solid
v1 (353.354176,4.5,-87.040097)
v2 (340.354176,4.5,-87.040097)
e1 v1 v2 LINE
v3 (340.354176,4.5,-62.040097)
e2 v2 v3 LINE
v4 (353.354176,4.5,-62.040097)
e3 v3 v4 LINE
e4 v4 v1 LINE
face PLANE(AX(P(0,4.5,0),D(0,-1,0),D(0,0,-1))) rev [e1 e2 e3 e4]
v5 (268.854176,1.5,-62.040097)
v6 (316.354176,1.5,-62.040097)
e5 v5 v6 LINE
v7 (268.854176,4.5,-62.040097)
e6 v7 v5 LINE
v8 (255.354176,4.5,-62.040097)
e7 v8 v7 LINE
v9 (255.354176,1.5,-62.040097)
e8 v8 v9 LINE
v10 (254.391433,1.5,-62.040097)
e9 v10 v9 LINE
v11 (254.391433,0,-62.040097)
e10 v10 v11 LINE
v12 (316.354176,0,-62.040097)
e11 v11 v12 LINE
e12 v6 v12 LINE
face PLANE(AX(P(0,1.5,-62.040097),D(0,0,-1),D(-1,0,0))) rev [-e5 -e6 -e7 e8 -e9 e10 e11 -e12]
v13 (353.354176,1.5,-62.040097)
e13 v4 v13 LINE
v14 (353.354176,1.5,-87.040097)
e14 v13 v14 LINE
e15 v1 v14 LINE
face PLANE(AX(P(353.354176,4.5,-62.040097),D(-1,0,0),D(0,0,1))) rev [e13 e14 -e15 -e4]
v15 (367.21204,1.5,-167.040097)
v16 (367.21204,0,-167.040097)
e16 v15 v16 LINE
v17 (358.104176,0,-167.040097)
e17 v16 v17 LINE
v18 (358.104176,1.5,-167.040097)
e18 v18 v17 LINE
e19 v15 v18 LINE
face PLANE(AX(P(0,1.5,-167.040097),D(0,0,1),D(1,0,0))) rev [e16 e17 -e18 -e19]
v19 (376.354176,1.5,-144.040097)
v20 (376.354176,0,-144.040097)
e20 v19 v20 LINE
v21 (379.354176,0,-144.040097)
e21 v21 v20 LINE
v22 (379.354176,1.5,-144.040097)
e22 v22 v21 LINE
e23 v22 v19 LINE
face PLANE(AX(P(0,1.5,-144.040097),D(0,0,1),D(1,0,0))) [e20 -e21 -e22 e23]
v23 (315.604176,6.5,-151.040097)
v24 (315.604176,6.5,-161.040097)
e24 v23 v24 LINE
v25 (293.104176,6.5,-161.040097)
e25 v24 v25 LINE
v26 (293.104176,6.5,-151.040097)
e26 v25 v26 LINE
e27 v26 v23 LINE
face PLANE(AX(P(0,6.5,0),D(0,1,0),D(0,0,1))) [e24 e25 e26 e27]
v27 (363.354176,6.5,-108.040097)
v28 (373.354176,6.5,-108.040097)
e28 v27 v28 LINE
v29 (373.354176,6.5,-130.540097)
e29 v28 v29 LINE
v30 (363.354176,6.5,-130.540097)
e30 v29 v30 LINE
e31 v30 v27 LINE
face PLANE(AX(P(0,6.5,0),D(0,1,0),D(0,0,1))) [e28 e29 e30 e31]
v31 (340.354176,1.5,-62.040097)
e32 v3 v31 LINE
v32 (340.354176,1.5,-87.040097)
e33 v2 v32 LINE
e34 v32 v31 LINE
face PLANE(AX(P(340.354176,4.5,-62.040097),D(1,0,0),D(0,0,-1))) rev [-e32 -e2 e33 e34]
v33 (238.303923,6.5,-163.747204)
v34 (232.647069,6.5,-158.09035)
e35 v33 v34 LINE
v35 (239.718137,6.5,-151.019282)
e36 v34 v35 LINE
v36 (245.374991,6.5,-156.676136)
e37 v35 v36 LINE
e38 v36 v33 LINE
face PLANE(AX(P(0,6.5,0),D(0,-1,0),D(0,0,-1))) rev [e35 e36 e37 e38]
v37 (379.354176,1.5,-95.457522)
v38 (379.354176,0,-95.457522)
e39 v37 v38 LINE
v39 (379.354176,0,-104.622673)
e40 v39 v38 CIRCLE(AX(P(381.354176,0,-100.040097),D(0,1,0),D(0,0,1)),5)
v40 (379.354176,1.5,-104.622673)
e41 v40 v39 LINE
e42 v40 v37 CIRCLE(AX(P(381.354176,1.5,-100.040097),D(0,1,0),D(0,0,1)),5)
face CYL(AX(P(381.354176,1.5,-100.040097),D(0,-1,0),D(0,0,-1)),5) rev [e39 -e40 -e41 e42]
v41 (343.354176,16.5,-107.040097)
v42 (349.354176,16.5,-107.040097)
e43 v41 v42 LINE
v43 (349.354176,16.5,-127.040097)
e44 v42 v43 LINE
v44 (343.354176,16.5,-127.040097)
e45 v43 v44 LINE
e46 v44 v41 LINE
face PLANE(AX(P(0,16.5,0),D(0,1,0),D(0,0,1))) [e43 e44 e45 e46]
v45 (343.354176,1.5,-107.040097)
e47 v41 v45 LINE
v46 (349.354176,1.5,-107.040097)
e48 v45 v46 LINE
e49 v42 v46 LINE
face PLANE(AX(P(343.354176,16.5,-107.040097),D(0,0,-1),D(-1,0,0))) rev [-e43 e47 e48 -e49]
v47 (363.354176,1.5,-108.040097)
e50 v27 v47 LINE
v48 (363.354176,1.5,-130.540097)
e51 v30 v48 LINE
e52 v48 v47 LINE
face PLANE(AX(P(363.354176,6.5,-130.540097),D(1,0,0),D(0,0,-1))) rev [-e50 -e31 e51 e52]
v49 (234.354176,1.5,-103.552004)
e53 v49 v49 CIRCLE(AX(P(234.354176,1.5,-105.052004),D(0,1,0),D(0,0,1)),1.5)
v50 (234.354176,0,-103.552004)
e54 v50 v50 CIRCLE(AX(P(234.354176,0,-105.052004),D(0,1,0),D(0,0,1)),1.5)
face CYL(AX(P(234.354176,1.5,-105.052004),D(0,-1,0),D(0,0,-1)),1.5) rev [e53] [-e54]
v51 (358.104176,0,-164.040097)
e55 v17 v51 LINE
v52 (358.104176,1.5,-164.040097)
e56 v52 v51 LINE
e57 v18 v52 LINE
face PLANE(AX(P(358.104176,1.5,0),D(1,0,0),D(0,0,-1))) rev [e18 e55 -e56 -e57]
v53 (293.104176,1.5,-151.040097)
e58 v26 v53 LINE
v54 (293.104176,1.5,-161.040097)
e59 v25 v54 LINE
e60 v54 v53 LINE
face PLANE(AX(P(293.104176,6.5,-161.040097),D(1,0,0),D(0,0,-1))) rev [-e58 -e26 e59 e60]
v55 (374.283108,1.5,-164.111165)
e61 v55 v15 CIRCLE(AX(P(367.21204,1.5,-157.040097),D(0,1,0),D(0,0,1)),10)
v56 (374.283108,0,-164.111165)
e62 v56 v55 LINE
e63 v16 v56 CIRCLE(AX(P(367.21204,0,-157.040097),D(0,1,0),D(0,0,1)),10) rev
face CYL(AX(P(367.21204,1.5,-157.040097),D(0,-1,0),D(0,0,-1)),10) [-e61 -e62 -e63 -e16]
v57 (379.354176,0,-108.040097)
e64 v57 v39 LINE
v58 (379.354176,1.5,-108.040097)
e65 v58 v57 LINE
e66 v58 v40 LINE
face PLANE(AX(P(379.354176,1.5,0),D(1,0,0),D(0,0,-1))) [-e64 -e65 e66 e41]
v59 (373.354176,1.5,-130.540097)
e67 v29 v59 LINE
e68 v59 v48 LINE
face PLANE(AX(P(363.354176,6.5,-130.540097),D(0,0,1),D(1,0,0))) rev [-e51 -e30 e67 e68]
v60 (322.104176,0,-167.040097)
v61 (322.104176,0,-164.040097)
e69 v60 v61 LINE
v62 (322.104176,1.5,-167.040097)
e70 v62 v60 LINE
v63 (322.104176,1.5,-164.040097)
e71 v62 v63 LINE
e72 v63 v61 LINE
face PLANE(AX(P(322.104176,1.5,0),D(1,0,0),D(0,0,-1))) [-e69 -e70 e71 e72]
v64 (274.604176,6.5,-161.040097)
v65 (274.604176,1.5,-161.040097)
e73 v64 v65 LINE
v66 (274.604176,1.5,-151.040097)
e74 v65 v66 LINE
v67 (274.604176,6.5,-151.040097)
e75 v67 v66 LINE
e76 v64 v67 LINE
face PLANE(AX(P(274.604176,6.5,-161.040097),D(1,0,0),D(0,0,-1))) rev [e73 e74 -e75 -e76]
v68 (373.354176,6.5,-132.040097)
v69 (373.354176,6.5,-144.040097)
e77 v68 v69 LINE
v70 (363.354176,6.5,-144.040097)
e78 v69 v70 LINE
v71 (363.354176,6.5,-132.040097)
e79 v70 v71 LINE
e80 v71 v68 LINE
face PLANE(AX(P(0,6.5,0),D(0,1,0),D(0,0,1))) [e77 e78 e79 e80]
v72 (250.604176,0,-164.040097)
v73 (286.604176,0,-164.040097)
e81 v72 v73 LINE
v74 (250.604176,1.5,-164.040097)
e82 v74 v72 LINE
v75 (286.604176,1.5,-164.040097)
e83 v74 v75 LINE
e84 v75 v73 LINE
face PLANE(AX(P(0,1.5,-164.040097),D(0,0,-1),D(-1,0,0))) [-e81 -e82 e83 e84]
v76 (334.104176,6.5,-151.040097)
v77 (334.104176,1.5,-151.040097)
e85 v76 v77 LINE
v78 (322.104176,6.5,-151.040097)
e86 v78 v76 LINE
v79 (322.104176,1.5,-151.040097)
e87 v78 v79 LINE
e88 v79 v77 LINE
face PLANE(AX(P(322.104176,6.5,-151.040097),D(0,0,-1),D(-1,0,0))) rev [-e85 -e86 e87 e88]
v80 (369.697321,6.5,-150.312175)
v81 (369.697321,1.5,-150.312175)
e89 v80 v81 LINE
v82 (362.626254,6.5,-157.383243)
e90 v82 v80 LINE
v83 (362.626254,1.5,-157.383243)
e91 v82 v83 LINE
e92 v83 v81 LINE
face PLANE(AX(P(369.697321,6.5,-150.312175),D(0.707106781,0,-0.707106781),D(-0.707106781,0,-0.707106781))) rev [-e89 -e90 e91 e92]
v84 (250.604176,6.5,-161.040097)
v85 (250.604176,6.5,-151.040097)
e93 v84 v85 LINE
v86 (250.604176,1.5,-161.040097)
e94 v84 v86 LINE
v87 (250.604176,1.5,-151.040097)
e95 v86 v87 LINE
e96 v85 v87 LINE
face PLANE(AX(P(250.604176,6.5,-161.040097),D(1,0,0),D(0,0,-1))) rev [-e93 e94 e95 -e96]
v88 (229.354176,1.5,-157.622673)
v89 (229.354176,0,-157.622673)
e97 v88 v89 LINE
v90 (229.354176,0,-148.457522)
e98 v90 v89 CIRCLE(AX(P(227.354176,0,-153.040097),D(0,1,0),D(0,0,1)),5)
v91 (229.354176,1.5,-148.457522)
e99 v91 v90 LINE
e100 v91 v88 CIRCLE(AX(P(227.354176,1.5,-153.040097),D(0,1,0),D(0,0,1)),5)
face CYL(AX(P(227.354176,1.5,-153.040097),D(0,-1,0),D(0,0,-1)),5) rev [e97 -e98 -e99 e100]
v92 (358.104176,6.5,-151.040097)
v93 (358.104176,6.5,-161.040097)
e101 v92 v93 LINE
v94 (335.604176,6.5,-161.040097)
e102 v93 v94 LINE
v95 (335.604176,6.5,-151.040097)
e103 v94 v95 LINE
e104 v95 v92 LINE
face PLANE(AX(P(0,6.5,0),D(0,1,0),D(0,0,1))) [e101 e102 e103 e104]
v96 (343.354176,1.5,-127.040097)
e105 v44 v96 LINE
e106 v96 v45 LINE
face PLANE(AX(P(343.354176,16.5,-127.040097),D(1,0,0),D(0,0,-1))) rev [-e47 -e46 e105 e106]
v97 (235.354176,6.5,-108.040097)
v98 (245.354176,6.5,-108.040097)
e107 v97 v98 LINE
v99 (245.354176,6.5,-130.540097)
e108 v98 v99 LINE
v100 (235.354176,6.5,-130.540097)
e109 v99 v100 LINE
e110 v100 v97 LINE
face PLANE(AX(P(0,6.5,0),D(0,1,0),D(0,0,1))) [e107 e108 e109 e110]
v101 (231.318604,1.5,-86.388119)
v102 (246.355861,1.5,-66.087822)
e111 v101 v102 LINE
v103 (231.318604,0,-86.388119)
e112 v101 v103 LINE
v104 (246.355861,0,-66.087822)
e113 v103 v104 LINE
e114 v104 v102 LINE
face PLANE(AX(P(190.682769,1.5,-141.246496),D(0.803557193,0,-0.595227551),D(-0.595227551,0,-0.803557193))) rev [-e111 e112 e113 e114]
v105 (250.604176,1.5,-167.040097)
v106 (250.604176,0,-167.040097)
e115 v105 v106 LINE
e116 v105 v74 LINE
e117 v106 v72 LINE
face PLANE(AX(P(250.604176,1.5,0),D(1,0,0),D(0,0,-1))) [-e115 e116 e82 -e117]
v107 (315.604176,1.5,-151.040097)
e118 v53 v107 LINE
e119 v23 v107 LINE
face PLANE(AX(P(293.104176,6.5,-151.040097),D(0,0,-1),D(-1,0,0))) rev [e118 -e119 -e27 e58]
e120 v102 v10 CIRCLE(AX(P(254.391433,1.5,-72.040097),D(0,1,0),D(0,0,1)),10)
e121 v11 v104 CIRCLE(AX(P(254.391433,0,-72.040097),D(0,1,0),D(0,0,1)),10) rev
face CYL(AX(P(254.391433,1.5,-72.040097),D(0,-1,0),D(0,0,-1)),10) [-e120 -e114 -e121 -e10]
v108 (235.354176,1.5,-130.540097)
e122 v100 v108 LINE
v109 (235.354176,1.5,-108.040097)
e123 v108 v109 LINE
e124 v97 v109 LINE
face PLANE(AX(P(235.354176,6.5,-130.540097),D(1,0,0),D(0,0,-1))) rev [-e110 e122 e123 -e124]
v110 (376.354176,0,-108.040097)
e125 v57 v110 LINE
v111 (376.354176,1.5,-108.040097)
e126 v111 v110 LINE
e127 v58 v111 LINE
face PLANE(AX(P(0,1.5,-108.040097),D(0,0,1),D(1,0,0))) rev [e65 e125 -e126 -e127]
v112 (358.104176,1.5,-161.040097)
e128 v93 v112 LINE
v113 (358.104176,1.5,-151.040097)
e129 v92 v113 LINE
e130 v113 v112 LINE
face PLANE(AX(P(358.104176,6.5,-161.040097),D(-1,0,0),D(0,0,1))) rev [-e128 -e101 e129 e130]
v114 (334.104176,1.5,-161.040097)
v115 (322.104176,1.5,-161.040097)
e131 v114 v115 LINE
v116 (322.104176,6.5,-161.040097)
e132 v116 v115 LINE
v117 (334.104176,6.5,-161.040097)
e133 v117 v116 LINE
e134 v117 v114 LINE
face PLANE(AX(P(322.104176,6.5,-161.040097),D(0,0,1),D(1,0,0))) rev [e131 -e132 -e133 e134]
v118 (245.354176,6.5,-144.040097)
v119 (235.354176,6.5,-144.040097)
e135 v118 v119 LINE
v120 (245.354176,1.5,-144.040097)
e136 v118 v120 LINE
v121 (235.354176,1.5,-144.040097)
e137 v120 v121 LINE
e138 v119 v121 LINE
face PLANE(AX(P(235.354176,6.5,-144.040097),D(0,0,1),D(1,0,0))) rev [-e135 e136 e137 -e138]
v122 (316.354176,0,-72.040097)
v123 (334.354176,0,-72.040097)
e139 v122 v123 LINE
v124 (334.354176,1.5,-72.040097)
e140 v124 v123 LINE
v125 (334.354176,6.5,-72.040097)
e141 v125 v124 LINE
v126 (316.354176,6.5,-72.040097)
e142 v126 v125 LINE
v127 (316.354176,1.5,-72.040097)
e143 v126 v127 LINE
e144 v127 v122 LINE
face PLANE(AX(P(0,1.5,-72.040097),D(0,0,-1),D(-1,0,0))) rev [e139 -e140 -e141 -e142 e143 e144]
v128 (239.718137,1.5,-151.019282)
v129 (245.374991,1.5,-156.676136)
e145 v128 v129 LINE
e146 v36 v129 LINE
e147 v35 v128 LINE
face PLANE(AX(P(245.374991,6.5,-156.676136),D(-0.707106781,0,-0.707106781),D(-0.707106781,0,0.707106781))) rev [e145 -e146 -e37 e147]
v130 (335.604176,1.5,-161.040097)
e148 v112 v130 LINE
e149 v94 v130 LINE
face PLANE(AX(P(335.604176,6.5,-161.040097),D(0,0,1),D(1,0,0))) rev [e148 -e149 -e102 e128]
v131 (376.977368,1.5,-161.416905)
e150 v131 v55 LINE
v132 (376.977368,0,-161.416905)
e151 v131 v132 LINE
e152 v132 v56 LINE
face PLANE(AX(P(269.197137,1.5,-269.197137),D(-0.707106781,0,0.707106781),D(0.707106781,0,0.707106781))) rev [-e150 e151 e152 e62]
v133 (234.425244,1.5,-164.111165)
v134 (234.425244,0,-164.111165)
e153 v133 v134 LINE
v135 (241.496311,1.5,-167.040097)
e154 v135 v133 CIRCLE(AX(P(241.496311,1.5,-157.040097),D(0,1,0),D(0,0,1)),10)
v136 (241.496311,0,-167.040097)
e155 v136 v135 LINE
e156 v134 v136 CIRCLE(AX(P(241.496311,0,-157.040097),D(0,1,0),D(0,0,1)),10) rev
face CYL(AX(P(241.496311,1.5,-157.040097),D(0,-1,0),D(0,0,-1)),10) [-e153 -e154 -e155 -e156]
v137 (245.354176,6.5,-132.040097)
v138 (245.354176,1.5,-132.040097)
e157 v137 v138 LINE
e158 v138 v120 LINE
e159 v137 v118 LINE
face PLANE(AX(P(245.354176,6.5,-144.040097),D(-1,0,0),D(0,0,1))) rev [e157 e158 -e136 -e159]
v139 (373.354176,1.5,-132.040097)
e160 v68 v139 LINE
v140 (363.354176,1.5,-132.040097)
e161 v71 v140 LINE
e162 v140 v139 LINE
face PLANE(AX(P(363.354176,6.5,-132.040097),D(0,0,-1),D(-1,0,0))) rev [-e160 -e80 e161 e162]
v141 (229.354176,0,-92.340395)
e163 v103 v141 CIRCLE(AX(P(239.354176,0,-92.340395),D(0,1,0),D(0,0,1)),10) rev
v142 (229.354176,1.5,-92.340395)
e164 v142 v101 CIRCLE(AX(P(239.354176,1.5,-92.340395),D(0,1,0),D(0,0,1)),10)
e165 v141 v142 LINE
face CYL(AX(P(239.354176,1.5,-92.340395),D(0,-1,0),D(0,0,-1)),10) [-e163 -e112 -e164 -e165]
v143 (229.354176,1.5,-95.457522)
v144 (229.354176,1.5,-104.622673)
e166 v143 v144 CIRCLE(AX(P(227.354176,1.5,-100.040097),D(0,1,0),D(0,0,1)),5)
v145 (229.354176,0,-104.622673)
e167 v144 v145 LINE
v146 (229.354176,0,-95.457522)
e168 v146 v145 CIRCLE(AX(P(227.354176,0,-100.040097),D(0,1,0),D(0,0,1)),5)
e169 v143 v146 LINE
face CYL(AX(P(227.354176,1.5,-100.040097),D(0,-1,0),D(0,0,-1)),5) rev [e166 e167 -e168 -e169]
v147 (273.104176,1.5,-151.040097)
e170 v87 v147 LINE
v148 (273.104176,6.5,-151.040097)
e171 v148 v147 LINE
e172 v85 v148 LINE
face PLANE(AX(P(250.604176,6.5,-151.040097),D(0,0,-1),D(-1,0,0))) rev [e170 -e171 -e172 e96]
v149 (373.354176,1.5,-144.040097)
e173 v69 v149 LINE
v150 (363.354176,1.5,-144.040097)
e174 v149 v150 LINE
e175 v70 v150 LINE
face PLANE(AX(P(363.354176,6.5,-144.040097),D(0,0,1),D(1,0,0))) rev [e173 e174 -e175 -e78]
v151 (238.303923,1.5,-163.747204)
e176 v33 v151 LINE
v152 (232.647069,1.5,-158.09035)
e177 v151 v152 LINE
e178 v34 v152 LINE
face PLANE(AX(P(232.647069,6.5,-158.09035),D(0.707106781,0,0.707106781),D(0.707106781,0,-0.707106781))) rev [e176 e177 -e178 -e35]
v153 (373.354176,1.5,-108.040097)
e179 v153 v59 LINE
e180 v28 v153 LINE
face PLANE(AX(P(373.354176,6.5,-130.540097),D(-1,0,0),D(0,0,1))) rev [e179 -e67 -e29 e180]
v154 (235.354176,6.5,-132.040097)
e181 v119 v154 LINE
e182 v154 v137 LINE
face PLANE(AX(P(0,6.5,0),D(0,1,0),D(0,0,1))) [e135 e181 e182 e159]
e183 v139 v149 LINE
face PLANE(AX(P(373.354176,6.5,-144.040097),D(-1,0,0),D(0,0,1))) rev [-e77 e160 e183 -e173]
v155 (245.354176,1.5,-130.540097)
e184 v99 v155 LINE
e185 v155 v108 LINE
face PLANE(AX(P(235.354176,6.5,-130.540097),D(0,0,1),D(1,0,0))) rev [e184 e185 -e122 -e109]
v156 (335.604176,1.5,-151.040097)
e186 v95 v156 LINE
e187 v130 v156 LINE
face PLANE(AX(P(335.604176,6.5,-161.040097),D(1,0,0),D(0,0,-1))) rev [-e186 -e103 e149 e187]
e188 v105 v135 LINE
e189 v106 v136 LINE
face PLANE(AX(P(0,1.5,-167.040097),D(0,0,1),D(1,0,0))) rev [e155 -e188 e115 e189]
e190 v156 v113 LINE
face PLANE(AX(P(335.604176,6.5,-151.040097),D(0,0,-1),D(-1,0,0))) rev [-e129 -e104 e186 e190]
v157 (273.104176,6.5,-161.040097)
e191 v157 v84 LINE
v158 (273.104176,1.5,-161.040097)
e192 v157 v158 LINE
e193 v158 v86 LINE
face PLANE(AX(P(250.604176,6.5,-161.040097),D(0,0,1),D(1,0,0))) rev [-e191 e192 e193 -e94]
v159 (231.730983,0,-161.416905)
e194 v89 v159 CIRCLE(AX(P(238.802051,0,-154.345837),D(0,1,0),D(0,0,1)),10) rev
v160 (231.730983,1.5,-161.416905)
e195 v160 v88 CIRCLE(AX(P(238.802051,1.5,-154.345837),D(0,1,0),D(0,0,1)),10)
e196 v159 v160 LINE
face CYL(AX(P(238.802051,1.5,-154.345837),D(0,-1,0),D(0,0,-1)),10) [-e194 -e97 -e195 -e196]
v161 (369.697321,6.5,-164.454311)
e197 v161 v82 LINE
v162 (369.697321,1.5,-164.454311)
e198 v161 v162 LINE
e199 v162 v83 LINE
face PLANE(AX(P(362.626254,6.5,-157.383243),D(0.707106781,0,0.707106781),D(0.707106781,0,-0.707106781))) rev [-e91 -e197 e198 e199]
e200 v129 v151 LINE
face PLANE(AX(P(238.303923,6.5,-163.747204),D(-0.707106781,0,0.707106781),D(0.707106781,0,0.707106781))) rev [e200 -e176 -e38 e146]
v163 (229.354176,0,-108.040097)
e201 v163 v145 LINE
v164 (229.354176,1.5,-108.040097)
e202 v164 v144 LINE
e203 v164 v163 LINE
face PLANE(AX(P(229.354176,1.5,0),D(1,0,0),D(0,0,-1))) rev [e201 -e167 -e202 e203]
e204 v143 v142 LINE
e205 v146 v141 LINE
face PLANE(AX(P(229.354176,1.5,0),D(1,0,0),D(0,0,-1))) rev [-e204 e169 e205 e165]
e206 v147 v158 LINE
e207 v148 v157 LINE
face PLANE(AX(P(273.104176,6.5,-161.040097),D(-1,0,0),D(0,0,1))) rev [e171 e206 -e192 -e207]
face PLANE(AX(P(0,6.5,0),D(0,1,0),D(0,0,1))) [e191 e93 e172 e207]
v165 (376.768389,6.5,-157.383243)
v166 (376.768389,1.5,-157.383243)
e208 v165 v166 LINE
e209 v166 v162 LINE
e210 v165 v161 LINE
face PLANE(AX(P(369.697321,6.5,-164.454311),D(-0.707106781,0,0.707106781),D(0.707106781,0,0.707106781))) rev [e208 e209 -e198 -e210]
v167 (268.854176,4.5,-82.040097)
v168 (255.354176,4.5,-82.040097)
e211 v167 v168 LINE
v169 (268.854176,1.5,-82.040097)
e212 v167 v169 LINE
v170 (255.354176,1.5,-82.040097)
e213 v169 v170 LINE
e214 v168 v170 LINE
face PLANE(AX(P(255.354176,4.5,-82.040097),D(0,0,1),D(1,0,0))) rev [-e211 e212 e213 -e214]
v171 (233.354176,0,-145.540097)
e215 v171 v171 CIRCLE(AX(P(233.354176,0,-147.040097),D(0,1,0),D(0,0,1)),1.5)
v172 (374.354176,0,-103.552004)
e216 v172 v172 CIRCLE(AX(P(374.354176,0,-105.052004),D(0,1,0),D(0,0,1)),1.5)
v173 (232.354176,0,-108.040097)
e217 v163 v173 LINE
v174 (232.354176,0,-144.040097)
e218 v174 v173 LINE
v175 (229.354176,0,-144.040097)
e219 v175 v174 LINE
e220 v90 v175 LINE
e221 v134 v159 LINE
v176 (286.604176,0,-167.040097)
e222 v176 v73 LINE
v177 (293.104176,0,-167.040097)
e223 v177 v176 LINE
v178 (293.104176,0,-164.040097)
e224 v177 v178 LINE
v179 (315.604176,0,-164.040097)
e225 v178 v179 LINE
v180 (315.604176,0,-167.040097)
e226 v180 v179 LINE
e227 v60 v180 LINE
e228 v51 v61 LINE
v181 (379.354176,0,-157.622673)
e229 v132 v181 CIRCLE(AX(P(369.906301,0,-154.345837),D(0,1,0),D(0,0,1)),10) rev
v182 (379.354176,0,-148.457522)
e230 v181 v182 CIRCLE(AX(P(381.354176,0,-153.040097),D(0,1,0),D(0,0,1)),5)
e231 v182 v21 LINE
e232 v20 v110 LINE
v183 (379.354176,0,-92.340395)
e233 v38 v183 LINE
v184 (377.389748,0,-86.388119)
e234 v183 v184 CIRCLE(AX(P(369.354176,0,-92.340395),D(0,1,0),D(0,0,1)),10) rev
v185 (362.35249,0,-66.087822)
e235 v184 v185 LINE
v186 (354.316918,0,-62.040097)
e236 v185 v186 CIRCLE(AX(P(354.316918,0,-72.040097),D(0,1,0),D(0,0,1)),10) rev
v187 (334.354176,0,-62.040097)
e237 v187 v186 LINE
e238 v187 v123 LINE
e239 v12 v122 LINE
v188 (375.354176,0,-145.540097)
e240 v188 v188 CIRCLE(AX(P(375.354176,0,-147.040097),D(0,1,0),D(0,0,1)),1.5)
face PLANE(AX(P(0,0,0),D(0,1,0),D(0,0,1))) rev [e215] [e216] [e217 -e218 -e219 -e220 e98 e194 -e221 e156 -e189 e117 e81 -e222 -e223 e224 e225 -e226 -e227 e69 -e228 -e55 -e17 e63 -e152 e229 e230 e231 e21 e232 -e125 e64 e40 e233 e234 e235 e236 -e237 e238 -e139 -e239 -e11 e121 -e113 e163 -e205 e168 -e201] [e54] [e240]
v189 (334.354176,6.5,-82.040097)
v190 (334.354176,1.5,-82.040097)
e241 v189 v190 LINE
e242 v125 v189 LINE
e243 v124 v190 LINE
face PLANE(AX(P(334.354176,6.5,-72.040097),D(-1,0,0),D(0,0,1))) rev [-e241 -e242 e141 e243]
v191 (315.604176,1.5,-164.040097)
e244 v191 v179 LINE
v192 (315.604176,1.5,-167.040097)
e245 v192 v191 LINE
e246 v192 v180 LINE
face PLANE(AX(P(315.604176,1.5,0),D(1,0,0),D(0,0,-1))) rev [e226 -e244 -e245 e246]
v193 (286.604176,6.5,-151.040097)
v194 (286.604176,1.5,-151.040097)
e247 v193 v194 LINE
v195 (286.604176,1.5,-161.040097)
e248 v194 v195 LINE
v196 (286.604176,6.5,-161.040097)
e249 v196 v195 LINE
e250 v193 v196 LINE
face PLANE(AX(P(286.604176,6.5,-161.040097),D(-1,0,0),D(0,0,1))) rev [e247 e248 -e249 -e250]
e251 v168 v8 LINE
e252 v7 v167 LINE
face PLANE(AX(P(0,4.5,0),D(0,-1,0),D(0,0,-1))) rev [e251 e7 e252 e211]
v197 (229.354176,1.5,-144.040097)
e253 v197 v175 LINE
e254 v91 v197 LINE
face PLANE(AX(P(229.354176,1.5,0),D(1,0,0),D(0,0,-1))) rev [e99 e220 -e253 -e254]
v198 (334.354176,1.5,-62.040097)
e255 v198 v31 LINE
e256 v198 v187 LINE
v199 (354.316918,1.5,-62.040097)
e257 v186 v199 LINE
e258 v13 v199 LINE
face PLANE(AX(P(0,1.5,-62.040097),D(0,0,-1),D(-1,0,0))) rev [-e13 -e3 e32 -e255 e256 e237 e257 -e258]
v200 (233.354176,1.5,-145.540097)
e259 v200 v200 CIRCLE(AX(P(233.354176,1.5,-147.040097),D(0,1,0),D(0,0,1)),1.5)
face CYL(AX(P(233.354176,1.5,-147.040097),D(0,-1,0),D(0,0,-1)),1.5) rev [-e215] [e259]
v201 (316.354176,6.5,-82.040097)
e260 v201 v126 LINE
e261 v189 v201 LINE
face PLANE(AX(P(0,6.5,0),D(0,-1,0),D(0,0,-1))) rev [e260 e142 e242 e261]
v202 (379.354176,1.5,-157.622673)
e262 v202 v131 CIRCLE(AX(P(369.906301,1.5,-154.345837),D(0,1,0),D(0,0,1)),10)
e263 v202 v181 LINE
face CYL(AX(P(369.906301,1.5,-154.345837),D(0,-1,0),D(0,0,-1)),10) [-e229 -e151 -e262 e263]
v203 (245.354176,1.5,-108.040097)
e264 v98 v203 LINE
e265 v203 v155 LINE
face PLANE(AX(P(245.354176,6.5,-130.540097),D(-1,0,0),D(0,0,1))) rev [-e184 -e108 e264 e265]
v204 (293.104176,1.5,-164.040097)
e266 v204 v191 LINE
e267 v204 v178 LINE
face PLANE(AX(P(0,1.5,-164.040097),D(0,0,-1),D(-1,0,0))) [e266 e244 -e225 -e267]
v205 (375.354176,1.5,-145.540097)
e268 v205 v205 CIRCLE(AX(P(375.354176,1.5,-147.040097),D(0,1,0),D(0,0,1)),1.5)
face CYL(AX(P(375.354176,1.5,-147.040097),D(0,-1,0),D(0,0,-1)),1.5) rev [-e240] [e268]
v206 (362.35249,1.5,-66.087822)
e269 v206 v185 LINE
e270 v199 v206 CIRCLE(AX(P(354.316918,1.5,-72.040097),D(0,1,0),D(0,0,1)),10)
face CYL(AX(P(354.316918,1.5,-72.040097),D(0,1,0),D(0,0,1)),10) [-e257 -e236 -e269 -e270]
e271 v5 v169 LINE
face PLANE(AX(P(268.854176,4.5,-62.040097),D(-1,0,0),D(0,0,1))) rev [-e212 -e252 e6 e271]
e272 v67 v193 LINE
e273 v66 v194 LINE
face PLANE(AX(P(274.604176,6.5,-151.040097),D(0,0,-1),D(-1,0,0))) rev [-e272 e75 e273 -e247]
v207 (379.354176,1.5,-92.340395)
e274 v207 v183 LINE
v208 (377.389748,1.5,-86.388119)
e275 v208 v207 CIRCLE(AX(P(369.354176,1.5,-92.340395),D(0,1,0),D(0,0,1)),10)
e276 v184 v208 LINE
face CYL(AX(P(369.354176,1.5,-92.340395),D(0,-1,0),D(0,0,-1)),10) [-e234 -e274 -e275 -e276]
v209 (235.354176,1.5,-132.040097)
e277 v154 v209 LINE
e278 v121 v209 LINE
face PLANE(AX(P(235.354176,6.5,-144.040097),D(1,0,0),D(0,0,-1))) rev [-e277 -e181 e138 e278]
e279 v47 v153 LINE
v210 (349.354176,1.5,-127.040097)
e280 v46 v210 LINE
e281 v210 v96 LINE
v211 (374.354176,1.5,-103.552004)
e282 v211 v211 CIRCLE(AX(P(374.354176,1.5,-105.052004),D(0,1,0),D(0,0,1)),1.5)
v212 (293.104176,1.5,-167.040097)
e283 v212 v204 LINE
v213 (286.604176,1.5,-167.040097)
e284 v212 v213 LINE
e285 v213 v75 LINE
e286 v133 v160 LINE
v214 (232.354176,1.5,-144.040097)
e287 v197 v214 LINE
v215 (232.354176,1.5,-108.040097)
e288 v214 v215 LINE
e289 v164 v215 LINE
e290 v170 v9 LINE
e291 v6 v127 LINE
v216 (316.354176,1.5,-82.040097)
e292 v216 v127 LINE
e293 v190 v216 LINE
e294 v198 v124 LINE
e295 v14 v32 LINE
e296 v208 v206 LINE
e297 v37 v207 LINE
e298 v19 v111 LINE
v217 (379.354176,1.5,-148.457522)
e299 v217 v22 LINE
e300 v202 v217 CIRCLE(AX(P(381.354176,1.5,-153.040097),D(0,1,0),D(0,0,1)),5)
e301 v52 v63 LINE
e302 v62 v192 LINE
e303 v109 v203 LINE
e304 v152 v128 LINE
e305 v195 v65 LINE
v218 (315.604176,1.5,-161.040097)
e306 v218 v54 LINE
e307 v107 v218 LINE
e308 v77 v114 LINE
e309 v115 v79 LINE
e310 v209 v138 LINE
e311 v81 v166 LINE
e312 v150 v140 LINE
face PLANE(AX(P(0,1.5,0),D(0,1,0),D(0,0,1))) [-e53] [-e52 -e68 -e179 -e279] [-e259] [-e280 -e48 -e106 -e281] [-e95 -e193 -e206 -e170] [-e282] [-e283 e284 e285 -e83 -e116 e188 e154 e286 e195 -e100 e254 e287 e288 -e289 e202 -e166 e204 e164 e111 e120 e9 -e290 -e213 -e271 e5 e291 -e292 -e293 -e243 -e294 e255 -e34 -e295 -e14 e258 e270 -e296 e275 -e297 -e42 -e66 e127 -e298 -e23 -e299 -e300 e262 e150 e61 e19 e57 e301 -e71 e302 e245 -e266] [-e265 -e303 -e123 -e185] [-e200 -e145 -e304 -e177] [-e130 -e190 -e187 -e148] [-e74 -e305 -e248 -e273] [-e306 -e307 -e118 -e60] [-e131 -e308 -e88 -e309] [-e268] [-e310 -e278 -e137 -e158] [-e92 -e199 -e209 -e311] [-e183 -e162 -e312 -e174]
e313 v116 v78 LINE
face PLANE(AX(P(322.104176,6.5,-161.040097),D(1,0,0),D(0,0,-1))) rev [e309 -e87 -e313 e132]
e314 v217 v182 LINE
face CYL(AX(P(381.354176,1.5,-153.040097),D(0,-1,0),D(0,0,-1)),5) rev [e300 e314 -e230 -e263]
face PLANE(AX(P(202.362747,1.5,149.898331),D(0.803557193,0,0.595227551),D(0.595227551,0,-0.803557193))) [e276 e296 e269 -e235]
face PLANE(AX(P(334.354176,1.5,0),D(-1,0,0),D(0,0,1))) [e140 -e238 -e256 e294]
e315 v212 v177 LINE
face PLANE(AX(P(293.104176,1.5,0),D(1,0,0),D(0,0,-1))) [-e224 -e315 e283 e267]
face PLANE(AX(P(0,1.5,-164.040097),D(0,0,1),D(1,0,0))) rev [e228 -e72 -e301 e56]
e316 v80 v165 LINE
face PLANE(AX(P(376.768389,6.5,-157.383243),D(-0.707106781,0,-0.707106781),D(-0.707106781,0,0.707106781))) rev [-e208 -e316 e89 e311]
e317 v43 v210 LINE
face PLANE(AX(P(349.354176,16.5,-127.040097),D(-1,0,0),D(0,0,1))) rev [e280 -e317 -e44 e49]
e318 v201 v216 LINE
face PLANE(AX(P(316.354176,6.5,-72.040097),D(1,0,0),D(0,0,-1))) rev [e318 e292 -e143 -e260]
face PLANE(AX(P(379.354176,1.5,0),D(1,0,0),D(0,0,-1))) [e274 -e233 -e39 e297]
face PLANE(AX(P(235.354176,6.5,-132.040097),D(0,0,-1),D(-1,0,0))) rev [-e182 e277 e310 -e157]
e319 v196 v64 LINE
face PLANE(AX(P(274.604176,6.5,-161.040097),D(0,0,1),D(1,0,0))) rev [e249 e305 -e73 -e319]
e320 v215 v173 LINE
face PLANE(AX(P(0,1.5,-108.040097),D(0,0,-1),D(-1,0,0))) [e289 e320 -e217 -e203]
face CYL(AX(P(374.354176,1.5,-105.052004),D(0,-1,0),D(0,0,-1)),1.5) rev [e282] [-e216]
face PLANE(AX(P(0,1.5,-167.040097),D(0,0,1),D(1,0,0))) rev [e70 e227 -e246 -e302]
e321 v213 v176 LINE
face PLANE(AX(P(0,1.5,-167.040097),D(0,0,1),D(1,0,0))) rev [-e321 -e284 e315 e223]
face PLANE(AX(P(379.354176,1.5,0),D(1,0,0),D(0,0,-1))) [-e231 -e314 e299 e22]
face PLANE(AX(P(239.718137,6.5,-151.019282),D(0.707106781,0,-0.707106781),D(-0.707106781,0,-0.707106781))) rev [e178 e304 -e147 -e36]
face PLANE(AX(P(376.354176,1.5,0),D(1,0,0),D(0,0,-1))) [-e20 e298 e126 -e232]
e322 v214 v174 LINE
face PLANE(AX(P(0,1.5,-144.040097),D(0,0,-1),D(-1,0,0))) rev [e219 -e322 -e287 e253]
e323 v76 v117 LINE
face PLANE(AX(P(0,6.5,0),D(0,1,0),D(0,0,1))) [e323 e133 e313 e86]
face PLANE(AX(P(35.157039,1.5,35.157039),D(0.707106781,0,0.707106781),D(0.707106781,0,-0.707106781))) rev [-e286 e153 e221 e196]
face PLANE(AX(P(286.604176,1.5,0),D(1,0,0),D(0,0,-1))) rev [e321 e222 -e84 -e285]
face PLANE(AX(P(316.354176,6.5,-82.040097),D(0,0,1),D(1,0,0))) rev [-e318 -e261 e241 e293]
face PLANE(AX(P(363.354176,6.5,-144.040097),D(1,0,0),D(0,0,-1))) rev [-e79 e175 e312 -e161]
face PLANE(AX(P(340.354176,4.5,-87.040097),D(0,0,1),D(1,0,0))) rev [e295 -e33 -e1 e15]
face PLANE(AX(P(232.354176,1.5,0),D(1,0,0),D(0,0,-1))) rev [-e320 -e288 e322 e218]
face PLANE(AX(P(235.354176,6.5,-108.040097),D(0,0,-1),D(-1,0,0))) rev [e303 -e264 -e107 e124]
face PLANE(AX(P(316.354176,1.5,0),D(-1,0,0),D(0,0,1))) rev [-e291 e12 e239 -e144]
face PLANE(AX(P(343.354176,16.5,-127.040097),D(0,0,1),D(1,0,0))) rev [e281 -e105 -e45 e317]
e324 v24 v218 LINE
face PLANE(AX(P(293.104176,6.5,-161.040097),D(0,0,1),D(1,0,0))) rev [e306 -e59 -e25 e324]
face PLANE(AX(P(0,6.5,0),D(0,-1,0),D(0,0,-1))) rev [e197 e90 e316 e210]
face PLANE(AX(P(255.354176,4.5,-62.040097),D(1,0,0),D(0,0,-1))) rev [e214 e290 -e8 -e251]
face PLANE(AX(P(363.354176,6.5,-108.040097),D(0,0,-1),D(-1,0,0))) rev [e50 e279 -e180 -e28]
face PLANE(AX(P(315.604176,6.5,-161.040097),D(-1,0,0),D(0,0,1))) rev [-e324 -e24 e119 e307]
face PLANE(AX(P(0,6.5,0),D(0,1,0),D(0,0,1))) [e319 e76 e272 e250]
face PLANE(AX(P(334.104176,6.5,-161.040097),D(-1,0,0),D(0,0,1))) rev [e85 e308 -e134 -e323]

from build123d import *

# Parameters (mm, degrees)
SKETCH_2_R      = 1.5
EXTRUDE_1_DEPTH = 1.5
SKETCH_3_W      = 22.5
SKETCH_3_H      = 10
SKETCH_3_W_2    = 12
SKETCH_3_W_3    = 10
SKETCH_3_H_2    = 12
SKETCH_3_H_3    = 22.5
SKETCH_3_W_4    = 18
EXTRUDE_2_DEPTH = 5
SKETCH_4_W      = 6
SKETCH_4_H      = 20
EXTRUDE_3_DEPTH = 15
FILLET_1_R      = 10
SKETCH_6_W      = 13.5
SKETCH_6_H      = 20
SKETCH_6_W_2    = 13
SKETCH_6_H_2    = 25
EXTRUDE_5_DEPTH = 3


with BuildPart() as part:
    # 草图2 → 凸台-拉伸1 (new body)
    # profile 1 of 3: a face of its own
    with BuildSketch(Plane(origin=(0, 0, 0), x_dir=(1, 0, 0), z_dir=(0, 1, 0))):
        with BuildLine():
            Line((250.604175692, 167.040097328), (237.354175692, 167.040097328))
            Line((237.354175692, 167.040097328), (229.354175692, 159.040097328))
            Line((229.354175692, 159.040097328), (229.354175692, 157.622673023))
            ThreePointArc((229.354175692, 157.622673023), (231.537475825, 155.778710115), (232.354175692, 153.040097328))
            ThreePointArc((232.354175692, 153.040097328), (231.537475825, 150.30148454), (229.354175692, 148.457521633))
            Line((229.354175692, 148.457521633), (229.354175692, 144.040097328))
            Line((229.354175692, 144.040097328), (232.354175692, 144.040097328))
            Line((232.354175692, 144.040097328), (232.354175692, 108.040097328))
            Line((232.354175692, 108.040097328), (229.354175692, 108.040097328))
            Line((229.354175692, 108.040097328), (229.354175692, 104.622673023))
            ThreePointArc((229.354175692, 104.622673023), (231.537475825, 102.778710115), (232.354175692, 100.040097328))
            ThreePointArc((232.354175692, 100.040097328), (231.537475825, 97.30148454), (229.354175692, 95.457521633))
            Line((229.354175692, 95.457521633), (229.354175692, 89.040097328))
            Line((229.354175692, 89.040097328), (248.966003356, 62.564129981))
            ThreePointArc((248.966003356, 62.564129981), (249.273338447, 62.30138118), (249.581919942, 62.040097328))
            Line((249.581919942, 62.040097328), (316.354175692, 62.040097328))
            Line((316.354175692, 62.040097328), (316.354175692, 72.040097328))
            Line((316.354175692, 72.040097328), (334.354175692, 72.040097328))
            Line((334.354175692, 72.040097328), (334.354175692, 62.040097328))
            Line((334.354175692, 62.040097328), (359.126431443, 62.040097328))
            ThreePointArc((359.126431443, 62.040097328), (359.435012937, 62.30138118), (359.742348028, 62.564129981))
            Line((359.742348028, 62.564129981), (379.354175692, 89.040097328))
            Line((379.354175692, 89.040097328), (379.354175692, 95.457521633))
            ThreePointArc((379.354175692, 95.457521633), (376.354175692, 100.040097328), (379.354175692, 104.622673023))
            Line((379.354175692, 104.622673023), (379.354175692, 108.040097328))
            Line((379.354175692, 108.040097328), (376.354175692, 108.040097328))
            Line((376.354175692, 108.040097328), (376.354175692, 144.040097328))
            Line((376.354175692, 144.040097328), (379.354175692, 144.040097328))
            Line((379.354175692, 144.040097328), (379.354175692, 148.457521633))
            ThreePointArc((379.354175692, 148.457521633), (376.354175692, 153.040097328), (379.354175692, 157.622673023))
            Line((379.354175692, 157.622673023), (379.354175692, 159.040097328))
            Line((379.354175692, 159.040097328), (371.354175692, 167.040097328))
            Line((371.354175692, 167.040097328), (358.104175692, 167.040097328))
            Line((358.104175692, 167.040097328), (358.104175692, 164.040097328))
            Line((358.104175692, 164.040097328), (322.104175692, 164.040097328))
            Line((322.104175692, 164.040097328), (322.104175692, 167.040097328))
            Line((322.104175692, 167.040097328), (315.604175692, 167.040097328))
            Line((315.604175692, 167.040097328), (315.604175692, 164.040097328))
            Line((315.604175692, 164.040097328), (293.104175692, 164.040097328))
            Line((293.104175692, 164.040097328), (293.104175692, 167.040097328))
            Line((293.104175692, 167.040097328), (286.604175692, 167.040097328))
            Line((286.604175692, 167.040097328), (286.604175692, 164.040097328))
            Line((286.604175692, 164.040097328), (250.604175692, 164.040097328))
            Line((250.604175692, 164.040097328), (250.604175692, 167.040097328))
        make_face()
        with Locations(Location((234.354175692, 105.052003777, 0), (0, 0, 270))):
            Circle(SKETCH_2_R, mode=Mode.SUBTRACT)
        with Locations(Location((374.354175692, 105.052003777, 0), (0, 0, 270))):
            Circle(SKETCH_2_R, mode=Mode.SUBTRACT)
        with Locations(Location((233.354175692, 147.040097328, 0), (0, 0, 270))):
            Circle(SKETCH_2_R, mode=Mode.SUBTRACT)
        with Locations(Location((375.354175692, 147.040097328, 0), (0, 0, 270))):
            Circle(SKETCH_2_R, mode=Mode.SUBTRACT)
    # profile 2 of 3: a face of its own
    with BuildSketch(Plane(origin=(0, 0, 0), x_dir=(1, 0, 0), z_dir=(0, 1, 0))):
        with BuildLine():
            ThreePointArc((249.581919942, 62.040097328), (249.273338447, 62.30138118), (248.966003356, 62.564129981))
            Line((248.966003356, 62.564129981), (249.354175692, 62.040097328))
            Line((249.354175692, 62.040097328), (249.581919942, 62.040097328))
        make_face()
    # profile 3 of 3: a face of its own
    with BuildSketch(Plane(origin=(0, 0, 0), x_dir=(1, 0, 0), z_dir=(0, 1, 0))):
        with BuildLine():
            ThreePointArc((359.742348028, 62.564129981), (359.435012937, 62.30138118), (359.126431443, 62.040097328))
            Line((359.126431443, 62.040097328), (359.354175692, 62.040097328))
            Line((359.354175692, 62.040097328), (359.742348028, 62.564129981))
        make_face()
    extrude(amount=EXTRUDE_1_DEPTH)

    # 草图3 → 凸台-拉伸2 (add)
    with BuildSketch(Plane(origin=(0, 1.5, 0), x_dir=(1, 0, 0), z_dir=(0, 1, 0))):
        with Locations((261.854175692, 156.040097328)):
            Rectangle(SKETCH_3_W, SKETCH_3_H)
        with Locations((280.604175692, 156.040097328)):
            Rectangle(SKETCH_3_W_2, SKETCH_3_H)
        with Locations((304.354175692, 156.040097328)):
            Rectangle(SKETCH_3_W, SKETCH_3_H)
        with Locations((328.104175692, 156.040097328)):
            Rectangle(SKETCH_3_W_2, SKETCH_3_H)
        with Locations((346.854175692, 156.040097328)):
            Rectangle(SKETCH_3_W, SKETCH_3_H)
        with Locations((368.354175692, 138.040097328)):
            Rectangle(SKETCH_3_W_3, SKETCH_3_H_2)
        with Locations((368.354175692, 119.290097328)):
            Rectangle(SKETCH_3_W_3, SKETCH_3_H_3)
        with Locations((240.354175692, 138.040097328)):
            Rectangle(SKETCH_3_W_3, SKETCH_3_H_2)
        with Locations((240.354175692, 119.290097328)):
            Rectangle(SKETCH_3_W_3, SKETCH_3_H_3)
        Polygon((232.647068911, 158.090349859), (238.30392316, 163.747204109), (245.374990972, 156.676136297), (239.718136723, 151.019282048), align=None)
        Polygon((369.697321443, 164.45431089), (376.768389254, 157.383243078), (369.697321443, 150.312175266), (362.626253631, 157.383243078), align=None)
        with Locations((325.354175692, 77.040097328)):
            Rectangle(SKETCH_3_W_4, SKETCH_3_H)
    extrude(amount=EXTRUDE_2_DEPTH)

    # 草图4 → 凸台-拉伸3 (add)
    with BuildSketch(Plane(origin=(0, 1.5, 0), x_dir=(1, 0, 0), z_dir=(0, 1, 0))):
        with Locations((346.354175692, 117.040097328)):
            Rectangle(SKETCH_4_W, SKETCH_4_H)
    extrude(amount=EXTRUDE_3_DEPTH)

    # 圆角1
    # the kernel refuses this fillet: 10 mm, written as the material it takes off along each edge
    with BuildSketch(Plane(origin=(229.354175692, -8.403282896, -159.040097328), x_dir=(0.7071067811865475, 0, -0.7071067811865475), z_dir=(0, 1, 0))) as fillet_1_piece_1:
        with BuildLine():
            CenterArc((3.361313158, -10), FILLET_1_R, 90, 25.871759313)
            Line((-1.002270338, -1.002270338), (-1.089542008, -0.822315745))
            ThreePointArc((-1.089542008, -0.822315745), (-0.642556525, -0.359713813), (-0.141421356, 0.141421356))
            Line((-0.141421356, 0.141421356), (0, 0.2))
            Line((0, 0.2), (3.361313158, 0.2))
            Line((3.361313158, 0.2), (3.361313158, 0))
        make_face()
    extrude(amount=18.306565791, mode=Mode.SUBTRACT)
    with BuildSketch(Plane(origin=(237.354175692, -10.355339059, -167.040097328), x_dir=(1, 0, 0), z_dir=(0, 1, 0)), Plane(origin=(371.354175692, -10.355339059, -167.040097328), x_dir=(0.707106781186544, 0, 0.7071067811865509), z_dir=(0, 1, 0))) as fillet_1_piece_2:
        with BuildLine():
            CenterArc((FILLET_1_R * 0.414213562373, -FILLET_1_R), FILLET_1_R, 90, 45)
            Line((-FILLET_1_R * 0.292893218813, -FILLET_1_R * 0.292893218813), (-FILLET_1_R * 0.307035354437, -FILLET_1_R * 0.27875108319))
            Line((-FILLET_1_R * 0.307035354437, -FILLET_1_R * 0.27875108319), (-FILLET_1_R * 0.00828427124746, FILLET_1_R * 0.02))
            Line((-FILLET_1_R * 0.00828427124746, FILLET_1_R * 0.02), (FILLET_1_R * 0.414213562373, FILLET_1_R * 0.02))
            Line((FILLET_1_R * 0.414213562373, FILLET_1_R * 0.02), (FILLET_1_R * 0.414213562373, 0))
        make_face()
    extrude(amount=22.210678119, mode=Mode.SUBTRACT)
    with BuildSketch(Plane(origin=(379.354175692, -8.403282896, -159.040097328), x_dir=(0, 0, 1), z_dir=(0, 1, 0))) as fillet_1_piece_3:
        with BuildLine():
            CenterArc((4.694260484, -9.44787514), FILLET_1_R, 109.128240687, 25.871759313)
            Line((-2.376807328, -2.376807328), (-2.518228684, -2.235385972))
            Line((-2.518228684, -2.235385972), (-0.141421356, 0.141421356))
            Line((-0.141421356, 0.141421356), (0, 0.2))
            ThreePointArc((0, 0.2), (0.708712153, 0.2), (1.351887581, 0.188957503))
            Line((1.351887581, 0.188957503), (1.417424305, 0))
        make_face()
    extrude(amount=18.306565791, mode=Mode.SUBTRACT)
    with BuildSketch(Plane(origin=(379.354175692, -8.250744041, -89.040097328), x_dir=(0, 0, -1), z_dir=(0, 1, 0))) as fillet_1_piece_4:
        with BuildLine():
            CenterArc((FILLET_1_R * 0.330029761641, FILLET_1_R), FILLET_1_R, 233.471144633, 36.528855367)
            Line((-FILLET_1_R * 0.265197788985, FILLET_1_R * 0.196442806655), (-FILLET_1_R * 0.277102339997, FILLET_1_R * 0.180371662788))
            Line((-FILLET_1_R * 0.277102339997, FILLET_1_R * 0.180371662788), (-FILLET_1_R * 0.00660059523282, -FILLET_1_R * 0.02))
            Line((-FILLET_1_R * 0.00660059523282, -FILLET_1_R * 0.02), (FILLET_1_R * 0.330029761641, -FILLET_1_R * 0.02))
            Line((FILLET_1_R * 0.330029761641, -FILLET_1_R * 0.02), (FILLET_1_R * 0.330029761641, 0))
        make_face()
    extrude(amount=18.001488082, mode=Mode.SUBTRACT)
    with BuildSketch(Plane(origin=(359.354175692, -12.593143734, -62.040097328), x_dir=(0.5952275506257363, 0, -0.8035571933447467), z_dir=(0, 1, 0))) as fillet_1_piece_5:
        with BuildLine():
            CenterArc((FILLET_1_R * 0.503725749364, FILLET_1_R), FILLET_1_R, 216.528855367, 53.471144633)
            Line((-FILLET_1_R * 0.299831443981, FILLET_1_R * 0.404772449374), (-FILLET_1_R * 0.315902587848, FILLET_1_R * 0.392867898362))
            Line((-FILLET_1_R * 0.315902587848, FILLET_1_R * 0.392867898362), (-FILLET_1_R * 0.0100745149873, -FILLET_1_R * 0.02))
            Line((-FILLET_1_R * 0.0100745149873, -FILLET_1_R * 0.02), (FILLET_1_R * 0.503725749364, -FILLET_1_R * 0.02))
            Line((FILLET_1_R * 0.503725749364, -FILLET_1_R * 0.02), (FILLET_1_R * 0.503725749364, 0))
        make_face()
    extrude(amount=26.686287468, mode=Mode.SUBTRACT)
    with BuildSketch(Plane(origin=(249.354175692, -12.593143734, -62.040097328), x_dir=(-0.5952275506257363, 0, -0.8035571933447467), z_dir=(0, 1, 0))) as fillet_1_piece_6:
        with BuildLine():
            CenterArc((FILLET_1_R * 0.503725749364, -FILLET_1_R), FILLET_1_R, 90, 53.471144633)
            Line((-FILLET_1_R * 0.299831443981, -FILLET_1_R * 0.404772449374), (-FILLET_1_R * 0.315902587848, -FILLET_1_R * 0.392867898362))
            Line((-FILLET_1_R * 0.315902587848, -FILLET_1_R * 0.392867898362), (-FILLET_1_R * 0.0100745149873, FILLET_1_R * 0.02))
            Line((-FILLET_1_R * 0.0100745149873, FILLET_1_R * 0.02), (FILLET_1_R * 0.503725749364, FILLET_1_R * 0.02))
            Line((FILLET_1_R * 0.503725749364, FILLET_1_R * 0.02), (FILLET_1_R * 0.503725749364, 0))
        make_face()
    extrude(amount=26.686287468, mode=Mode.SUBTRACT)
    with BuildSketch(Plane(origin=(229.354175692, -8.250744041, -89.040097328), x_dir=(0, 0, -1), z_dir=(0, 1, 0))) as fillet_1_piece_7:
        with BuildLine():
            CenterArc((FILLET_1_R * 0.330029761641, -FILLET_1_R), FILLET_1_R, 90, 36.528855367)
            Line((-FILLET_1_R * 0.265197788985, -FILLET_1_R * 0.196442806655), (-FILLET_1_R * 0.277102339997, -FILLET_1_R * 0.180371662788))
            Line((-FILLET_1_R * 0.277102339997, -FILLET_1_R * 0.180371662788), (-FILLET_1_R * 0.00660059523282, FILLET_1_R * 0.02))
            Line((-FILLET_1_R * 0.00660059523282, FILLET_1_R * 0.02), (FILLET_1_R * 0.330029761641, FILLET_1_R * 0.02))
            Line((FILLET_1_R * 0.330029761641, FILLET_1_R * 0.02), (FILLET_1_R * 0.330029761641, 0))
        make_face()
    extrude(amount=18.001488082, mode=Mode.SUBTRACT)

    # 草图6 → 凸台-拉伸5 (add)
    with BuildSketch(Plane(origin=(0, 1.5, 0), x_dir=(1, 0, 0), z_dir=(0, 1, 0))):
        with Locations((262.104175692, 72.040097328)):
            Rectangle(SKETCH_6_W, SKETCH_6_H)
        with Locations((346.854175692, 74.540097328)):
            Rectangle(SKETCH_6_W_2, SKETCH_6_H_2)
    extrude(amount=EXTRUDE_5_DEPTH)


solid = part.part
